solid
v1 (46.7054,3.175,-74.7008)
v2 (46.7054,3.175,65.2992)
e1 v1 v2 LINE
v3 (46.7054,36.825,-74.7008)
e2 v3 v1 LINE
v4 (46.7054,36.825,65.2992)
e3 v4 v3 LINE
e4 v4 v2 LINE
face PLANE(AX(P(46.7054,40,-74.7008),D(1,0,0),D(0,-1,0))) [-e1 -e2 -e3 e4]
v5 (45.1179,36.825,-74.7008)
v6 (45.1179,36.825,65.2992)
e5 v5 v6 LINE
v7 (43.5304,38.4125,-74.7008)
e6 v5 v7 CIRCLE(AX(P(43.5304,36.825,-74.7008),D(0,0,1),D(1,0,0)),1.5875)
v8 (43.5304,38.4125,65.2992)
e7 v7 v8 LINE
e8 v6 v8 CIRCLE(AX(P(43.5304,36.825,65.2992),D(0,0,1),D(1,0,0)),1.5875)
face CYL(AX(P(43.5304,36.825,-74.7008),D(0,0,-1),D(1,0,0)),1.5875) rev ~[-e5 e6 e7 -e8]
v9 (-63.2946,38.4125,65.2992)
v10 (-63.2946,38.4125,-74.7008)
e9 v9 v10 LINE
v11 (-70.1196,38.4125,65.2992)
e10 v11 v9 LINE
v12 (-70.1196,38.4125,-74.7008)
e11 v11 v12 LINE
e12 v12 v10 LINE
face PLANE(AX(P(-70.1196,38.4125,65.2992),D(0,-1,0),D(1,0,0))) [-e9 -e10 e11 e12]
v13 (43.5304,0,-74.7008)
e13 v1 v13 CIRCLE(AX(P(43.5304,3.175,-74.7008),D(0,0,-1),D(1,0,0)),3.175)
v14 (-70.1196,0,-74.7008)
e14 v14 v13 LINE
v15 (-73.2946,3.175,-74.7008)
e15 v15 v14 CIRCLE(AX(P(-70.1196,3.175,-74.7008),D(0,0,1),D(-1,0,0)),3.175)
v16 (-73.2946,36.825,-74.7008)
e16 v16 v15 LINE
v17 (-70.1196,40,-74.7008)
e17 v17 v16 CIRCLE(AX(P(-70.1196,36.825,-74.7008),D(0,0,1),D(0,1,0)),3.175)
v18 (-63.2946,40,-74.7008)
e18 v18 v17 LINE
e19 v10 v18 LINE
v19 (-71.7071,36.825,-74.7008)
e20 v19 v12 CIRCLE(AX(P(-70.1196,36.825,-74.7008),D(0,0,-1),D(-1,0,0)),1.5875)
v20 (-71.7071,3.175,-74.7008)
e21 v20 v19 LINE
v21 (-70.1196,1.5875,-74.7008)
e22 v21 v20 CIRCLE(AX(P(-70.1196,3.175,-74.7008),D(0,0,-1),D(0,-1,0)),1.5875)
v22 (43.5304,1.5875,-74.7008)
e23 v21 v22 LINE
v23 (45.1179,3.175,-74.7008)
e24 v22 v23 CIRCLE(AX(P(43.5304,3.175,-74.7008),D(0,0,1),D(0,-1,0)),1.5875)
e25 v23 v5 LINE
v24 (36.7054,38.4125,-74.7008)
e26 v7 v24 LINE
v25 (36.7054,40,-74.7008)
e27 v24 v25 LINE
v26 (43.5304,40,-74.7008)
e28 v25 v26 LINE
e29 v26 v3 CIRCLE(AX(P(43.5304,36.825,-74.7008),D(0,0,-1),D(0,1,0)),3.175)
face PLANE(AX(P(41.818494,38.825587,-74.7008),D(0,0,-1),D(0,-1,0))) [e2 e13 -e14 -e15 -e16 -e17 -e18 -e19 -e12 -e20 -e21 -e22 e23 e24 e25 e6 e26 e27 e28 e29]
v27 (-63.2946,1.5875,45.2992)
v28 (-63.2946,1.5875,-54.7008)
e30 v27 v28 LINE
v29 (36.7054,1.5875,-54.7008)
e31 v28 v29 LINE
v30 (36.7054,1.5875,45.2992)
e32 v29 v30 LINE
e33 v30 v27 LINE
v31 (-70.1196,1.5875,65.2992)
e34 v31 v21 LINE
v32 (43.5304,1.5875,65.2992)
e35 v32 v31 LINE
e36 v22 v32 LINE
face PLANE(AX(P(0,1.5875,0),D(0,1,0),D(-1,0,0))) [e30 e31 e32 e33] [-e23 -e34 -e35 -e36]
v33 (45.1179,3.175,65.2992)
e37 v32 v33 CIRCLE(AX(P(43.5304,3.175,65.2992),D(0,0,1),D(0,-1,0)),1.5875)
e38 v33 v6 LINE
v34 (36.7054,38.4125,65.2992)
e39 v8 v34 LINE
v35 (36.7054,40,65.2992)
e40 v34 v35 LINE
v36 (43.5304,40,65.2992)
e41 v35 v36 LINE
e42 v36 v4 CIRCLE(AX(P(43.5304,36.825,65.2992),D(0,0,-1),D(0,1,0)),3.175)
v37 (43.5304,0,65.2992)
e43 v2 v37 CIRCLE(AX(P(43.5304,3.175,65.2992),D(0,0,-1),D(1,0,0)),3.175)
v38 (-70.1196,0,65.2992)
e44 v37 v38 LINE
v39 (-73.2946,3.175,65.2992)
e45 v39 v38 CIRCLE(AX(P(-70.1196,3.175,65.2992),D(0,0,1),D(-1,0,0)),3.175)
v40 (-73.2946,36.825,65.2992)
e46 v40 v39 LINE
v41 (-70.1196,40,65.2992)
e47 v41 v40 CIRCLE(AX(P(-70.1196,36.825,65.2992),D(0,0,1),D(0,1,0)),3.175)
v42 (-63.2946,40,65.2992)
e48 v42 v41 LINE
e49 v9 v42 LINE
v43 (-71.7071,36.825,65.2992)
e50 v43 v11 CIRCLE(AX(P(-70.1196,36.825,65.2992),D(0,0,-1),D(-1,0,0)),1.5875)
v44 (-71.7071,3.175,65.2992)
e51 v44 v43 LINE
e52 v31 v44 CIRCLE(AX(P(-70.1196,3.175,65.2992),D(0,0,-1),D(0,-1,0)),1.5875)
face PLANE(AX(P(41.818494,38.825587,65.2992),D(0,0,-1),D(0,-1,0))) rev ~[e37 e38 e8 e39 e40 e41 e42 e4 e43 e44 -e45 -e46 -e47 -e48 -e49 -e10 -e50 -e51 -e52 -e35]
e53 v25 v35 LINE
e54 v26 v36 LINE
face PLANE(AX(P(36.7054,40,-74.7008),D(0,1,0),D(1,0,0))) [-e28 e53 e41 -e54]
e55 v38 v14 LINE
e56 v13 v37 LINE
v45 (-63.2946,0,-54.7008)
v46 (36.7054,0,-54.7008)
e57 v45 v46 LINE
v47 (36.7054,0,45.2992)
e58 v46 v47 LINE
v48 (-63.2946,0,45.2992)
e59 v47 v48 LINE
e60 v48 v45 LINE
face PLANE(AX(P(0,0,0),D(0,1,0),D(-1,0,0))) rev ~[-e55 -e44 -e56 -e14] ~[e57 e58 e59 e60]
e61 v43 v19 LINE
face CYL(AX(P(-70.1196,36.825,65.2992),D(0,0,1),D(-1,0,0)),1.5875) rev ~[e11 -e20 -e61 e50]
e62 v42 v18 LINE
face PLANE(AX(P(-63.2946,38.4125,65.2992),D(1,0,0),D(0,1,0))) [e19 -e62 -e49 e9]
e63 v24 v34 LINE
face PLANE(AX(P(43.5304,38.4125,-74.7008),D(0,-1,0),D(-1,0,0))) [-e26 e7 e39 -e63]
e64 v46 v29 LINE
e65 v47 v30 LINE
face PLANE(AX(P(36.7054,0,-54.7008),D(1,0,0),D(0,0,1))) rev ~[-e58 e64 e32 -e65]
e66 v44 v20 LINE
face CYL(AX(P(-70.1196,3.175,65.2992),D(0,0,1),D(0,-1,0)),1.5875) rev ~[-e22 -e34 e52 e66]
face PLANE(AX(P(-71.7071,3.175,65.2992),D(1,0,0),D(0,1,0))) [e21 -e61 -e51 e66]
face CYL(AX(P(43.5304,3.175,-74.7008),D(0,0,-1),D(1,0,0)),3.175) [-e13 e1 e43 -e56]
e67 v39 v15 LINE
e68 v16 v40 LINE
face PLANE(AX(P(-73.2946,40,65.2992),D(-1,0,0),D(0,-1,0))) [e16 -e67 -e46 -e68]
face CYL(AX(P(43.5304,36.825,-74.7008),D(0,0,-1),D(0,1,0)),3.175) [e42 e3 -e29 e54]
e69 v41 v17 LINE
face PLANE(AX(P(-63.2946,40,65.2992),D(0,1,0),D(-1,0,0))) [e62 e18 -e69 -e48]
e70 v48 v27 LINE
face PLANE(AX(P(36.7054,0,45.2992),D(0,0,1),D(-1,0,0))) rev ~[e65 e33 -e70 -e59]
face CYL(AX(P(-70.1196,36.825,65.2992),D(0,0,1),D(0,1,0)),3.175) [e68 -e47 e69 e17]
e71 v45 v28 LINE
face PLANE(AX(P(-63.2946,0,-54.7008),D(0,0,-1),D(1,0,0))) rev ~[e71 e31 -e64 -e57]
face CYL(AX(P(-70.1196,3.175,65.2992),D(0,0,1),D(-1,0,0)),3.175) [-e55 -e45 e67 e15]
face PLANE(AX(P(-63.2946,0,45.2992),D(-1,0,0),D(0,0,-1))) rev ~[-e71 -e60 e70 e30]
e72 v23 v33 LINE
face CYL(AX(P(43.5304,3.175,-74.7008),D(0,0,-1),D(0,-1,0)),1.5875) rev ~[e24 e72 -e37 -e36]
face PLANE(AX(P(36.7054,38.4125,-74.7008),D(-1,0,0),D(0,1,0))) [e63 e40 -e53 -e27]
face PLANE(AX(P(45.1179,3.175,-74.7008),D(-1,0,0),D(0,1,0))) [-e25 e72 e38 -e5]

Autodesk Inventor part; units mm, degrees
ref_plane "YZ Plane" through (0, 0, 0) normal (1, 0, 0) x (0, 1, 0)
ref_plane "XZ Plane" through (0, 0, 0) normal (0, 1, 0) x (-1, 0, 0)
ref_plane "XY Plane" through (0, 0, 0) normal (0, 0, 1) x (1, 0, 0)
sketch "Sketch1" plane through (0, 0, 0) normal (0, 1, 0) x (-1, 0, 0)
  line L0 (-36.7054, 45.2992) -> (63.2946, 45.2992)
  line L1 (63.2946, 45.2992) -> (63.2946, -54.7008)
  line L2 (63.2946, -54.7008) -> (-36.7054, -54.7008)
  line L3 (-36.7054, -54.7008) -> (-36.7054, 45.2992)
  line L4 (73.2946, -74.7008) -> (-46.7054, -74.7008)
  line L5 (-46.7054, -74.7008) -> (-46.7054, 65.2992)
  line L6 (-46.7054, 65.2992) -> (73.2946, 65.2992)
  line L7 (73.2946, 65.2992) -> (73.2946, -74.7008)
  point P0 (0, 0)
  dimension "d0" = 100
  dimension "d1" = 100
  dimension "d2" = 120
  dimension "d3" = 140
  dimension "d4" = 20
  dimension "d5" = 10
extrude "Plate1" add sketch "Sketch1" along normal blind 1.5875
sketch "Sketch2" plane through (45.1179, 0, -74.7008) normal (1, 0, 0) x (0, 1, 0)
  line L0 (0, 140) -> (0, 0)
  line L1 (0, 0) -> (40, 0)
  line L2 (40, 0) -> (40, 140)
  line L3 (40, 140) -> (0, 140)
edge flange "Flange1" height 40 angle 90 thickness 1.5875 bend radius 1.5875 thickness toward (1, 0, 0) relief tear relief width 1.5875 relief depth 0.7937 edges at (46.7054, 1.5875, -4.7008) wall of the first edge with corners at (45.1179, 0, 65.2992) (45.1179, 0, -74.7008) (45.1179, 40, -74.7008) (45.1179, 40, 65.2992)
bend "Bend1"
corner "Corner1"
sketch "Sketch3" plane through (-71.7071, 0, 65.2992) normal (-1, 0, 0) x (0, -1, 0)
  line L0 (0, -140) -> (0, 0)
  line L1 (0, 0) -> (-40, 0)
  line L2 (-40, 0) -> (-40, -140)
  line L3 (-40, -140) -> (0, -140)
edge flange "Flange2" height 40 angle 90 thickness 1.5875 bend radius 1.5875 thickness toward (-1, 0, 0) relief tear relief width 1.5875 relief depth 0.7937 edges at (-73.2946, 1.5875, -4.7008) wall of the first edge with corners at (-71.7071, 0, -74.7008) (-71.7071, 0, 65.2992) (-71.7071, 40, 65.2992) (-71.7071, 40, -74.7008)
bend "Bend2"
corner "Corner2"
sketch "Sketch4" plane through (-73.2946, 38.4125, 65.2992) normal (0, 1, 0) x (-1, 0, 0)
  line L0 (0, -140) -> (0, 0)
  line L1 (0, 0) -> (-10, 0)
  line L2 (-10, 0) -> (-10, -140)
  line L3 (-10, -140) -> (0, -140)
edge flange "Flange3" height 10 angle 90 thickness 1.5875 bend radius 1.5875 thickness toward (0, 1, 0) relief tear relief width 1.5875 relief depth 0.7937 edges at (-71.7071, 40, -4.7008) wall of the first edge with corners at (-73.2946, 38.4125, -74.7008) (-73.2946, 38.4125, 65.2992) (-63.2946, 38.4125, 65.2992) (-63.2946, 38.4125, -74.7008)
bend "Bend3"
corner "Corner3"
sketch "Sketch5" plane through (46.7054, 38.4125, -74.7008) normal (0, 1, 0) x (-1, 0, 0)
  line L0 (0, 140) -> (0, 0)
  line L1 (0, 0) -> (10, 0)
  line L2 (10, 0) -> (10, 140)
  line L3 (10, 140) -> (0, 140)
edge flange "Flange4" height 10 angle 90 thickness 1.5875 bend radius 1.5875 thickness toward (0, 1, 0) relief tear relief width 1.5875 relief depth 0.7937 edges at (45.1179, 40, -4.7008) wall of the first edge with corners at (46.7054, 38.4125, 65.2992) (46.7054, 38.4125, -74.7008) (36.7054, 38.4125, -74.7008) (36.7054, 38.4125, 65.2992)
bend "Bend4"
corner "Corner4"
equation "\"d7\" = BendReliefWidth"
equation "\"d8\" = BendReliefDepth"
equation "\"d9\" = MinimumRemnant"
equation "\"d10\" = BendRadius"
equation "\"d13\" = BendRadius"
equation "\"d14\" = CornerReliefSize"
equation "\"d15\" = GapSize"
equation "\"d16\" = JacobiRadiusSize"
equation "\"d17\" = BendReliefWidth"
equation "\"d18\" = BendReliefDepth"
equation "\"d19\" = MinimumRemnant"
equation "\"d20\" = BendRadius"
equation "\"d23\" = BendRadius"
equation "\"d24\" = CornerReliefSize"
equation "\"d25\" = GapSize"
equation "\"d26\" = JacobiRadiusSize"
equation "\"d27\" = BendReliefWidth"
equation "\"d28\" = BendReliefDepth"
equation "\"d29\" = MinimumRemnant"
equation "\"d30\" = BendRadius"
equation "\"d33\" = BendRadius"
equation "\"d34\" = CornerReliefSize"
equation "\"d35\" = GapSize"
equation "\"d36\" = JacobiRadiusSize"
equation "\"d37\" = BendReliefWidth"
equation "\"d38\" = BendReliefDepth"
equation "\"d39\" = MinimumRemnant"
equation "\"d40\" = BendRadius"
equation "\"d43\" = BendRadius"
equation "\"d44\" = CornerReliefSize"
equation "\"d45\" = GapSize"
equation "\"d46\" = JacobiRadiusSize"
equation "\"BendRadius\" = Thickness"
equation "\"BendReliefWidth\" = Thickness"
equation "\"BendReliefDepth\" = 0.5 * Thickness"
equation "\"CornerReliefSize\" = 4 * Thickness"
equation "\"MinimumRemnant\" = 2 * Thickness"
equation "\"TransitionRadius\" = BendRadius"
equation "\"JacobiRadiusSize\" = BendRadius"
equation "\"GapSize\" = Thickness"
equation "\"d6\" = BendRadius"
equation "\"Thickness\" = 1.5875"
properties part number "DishFanMetal"
